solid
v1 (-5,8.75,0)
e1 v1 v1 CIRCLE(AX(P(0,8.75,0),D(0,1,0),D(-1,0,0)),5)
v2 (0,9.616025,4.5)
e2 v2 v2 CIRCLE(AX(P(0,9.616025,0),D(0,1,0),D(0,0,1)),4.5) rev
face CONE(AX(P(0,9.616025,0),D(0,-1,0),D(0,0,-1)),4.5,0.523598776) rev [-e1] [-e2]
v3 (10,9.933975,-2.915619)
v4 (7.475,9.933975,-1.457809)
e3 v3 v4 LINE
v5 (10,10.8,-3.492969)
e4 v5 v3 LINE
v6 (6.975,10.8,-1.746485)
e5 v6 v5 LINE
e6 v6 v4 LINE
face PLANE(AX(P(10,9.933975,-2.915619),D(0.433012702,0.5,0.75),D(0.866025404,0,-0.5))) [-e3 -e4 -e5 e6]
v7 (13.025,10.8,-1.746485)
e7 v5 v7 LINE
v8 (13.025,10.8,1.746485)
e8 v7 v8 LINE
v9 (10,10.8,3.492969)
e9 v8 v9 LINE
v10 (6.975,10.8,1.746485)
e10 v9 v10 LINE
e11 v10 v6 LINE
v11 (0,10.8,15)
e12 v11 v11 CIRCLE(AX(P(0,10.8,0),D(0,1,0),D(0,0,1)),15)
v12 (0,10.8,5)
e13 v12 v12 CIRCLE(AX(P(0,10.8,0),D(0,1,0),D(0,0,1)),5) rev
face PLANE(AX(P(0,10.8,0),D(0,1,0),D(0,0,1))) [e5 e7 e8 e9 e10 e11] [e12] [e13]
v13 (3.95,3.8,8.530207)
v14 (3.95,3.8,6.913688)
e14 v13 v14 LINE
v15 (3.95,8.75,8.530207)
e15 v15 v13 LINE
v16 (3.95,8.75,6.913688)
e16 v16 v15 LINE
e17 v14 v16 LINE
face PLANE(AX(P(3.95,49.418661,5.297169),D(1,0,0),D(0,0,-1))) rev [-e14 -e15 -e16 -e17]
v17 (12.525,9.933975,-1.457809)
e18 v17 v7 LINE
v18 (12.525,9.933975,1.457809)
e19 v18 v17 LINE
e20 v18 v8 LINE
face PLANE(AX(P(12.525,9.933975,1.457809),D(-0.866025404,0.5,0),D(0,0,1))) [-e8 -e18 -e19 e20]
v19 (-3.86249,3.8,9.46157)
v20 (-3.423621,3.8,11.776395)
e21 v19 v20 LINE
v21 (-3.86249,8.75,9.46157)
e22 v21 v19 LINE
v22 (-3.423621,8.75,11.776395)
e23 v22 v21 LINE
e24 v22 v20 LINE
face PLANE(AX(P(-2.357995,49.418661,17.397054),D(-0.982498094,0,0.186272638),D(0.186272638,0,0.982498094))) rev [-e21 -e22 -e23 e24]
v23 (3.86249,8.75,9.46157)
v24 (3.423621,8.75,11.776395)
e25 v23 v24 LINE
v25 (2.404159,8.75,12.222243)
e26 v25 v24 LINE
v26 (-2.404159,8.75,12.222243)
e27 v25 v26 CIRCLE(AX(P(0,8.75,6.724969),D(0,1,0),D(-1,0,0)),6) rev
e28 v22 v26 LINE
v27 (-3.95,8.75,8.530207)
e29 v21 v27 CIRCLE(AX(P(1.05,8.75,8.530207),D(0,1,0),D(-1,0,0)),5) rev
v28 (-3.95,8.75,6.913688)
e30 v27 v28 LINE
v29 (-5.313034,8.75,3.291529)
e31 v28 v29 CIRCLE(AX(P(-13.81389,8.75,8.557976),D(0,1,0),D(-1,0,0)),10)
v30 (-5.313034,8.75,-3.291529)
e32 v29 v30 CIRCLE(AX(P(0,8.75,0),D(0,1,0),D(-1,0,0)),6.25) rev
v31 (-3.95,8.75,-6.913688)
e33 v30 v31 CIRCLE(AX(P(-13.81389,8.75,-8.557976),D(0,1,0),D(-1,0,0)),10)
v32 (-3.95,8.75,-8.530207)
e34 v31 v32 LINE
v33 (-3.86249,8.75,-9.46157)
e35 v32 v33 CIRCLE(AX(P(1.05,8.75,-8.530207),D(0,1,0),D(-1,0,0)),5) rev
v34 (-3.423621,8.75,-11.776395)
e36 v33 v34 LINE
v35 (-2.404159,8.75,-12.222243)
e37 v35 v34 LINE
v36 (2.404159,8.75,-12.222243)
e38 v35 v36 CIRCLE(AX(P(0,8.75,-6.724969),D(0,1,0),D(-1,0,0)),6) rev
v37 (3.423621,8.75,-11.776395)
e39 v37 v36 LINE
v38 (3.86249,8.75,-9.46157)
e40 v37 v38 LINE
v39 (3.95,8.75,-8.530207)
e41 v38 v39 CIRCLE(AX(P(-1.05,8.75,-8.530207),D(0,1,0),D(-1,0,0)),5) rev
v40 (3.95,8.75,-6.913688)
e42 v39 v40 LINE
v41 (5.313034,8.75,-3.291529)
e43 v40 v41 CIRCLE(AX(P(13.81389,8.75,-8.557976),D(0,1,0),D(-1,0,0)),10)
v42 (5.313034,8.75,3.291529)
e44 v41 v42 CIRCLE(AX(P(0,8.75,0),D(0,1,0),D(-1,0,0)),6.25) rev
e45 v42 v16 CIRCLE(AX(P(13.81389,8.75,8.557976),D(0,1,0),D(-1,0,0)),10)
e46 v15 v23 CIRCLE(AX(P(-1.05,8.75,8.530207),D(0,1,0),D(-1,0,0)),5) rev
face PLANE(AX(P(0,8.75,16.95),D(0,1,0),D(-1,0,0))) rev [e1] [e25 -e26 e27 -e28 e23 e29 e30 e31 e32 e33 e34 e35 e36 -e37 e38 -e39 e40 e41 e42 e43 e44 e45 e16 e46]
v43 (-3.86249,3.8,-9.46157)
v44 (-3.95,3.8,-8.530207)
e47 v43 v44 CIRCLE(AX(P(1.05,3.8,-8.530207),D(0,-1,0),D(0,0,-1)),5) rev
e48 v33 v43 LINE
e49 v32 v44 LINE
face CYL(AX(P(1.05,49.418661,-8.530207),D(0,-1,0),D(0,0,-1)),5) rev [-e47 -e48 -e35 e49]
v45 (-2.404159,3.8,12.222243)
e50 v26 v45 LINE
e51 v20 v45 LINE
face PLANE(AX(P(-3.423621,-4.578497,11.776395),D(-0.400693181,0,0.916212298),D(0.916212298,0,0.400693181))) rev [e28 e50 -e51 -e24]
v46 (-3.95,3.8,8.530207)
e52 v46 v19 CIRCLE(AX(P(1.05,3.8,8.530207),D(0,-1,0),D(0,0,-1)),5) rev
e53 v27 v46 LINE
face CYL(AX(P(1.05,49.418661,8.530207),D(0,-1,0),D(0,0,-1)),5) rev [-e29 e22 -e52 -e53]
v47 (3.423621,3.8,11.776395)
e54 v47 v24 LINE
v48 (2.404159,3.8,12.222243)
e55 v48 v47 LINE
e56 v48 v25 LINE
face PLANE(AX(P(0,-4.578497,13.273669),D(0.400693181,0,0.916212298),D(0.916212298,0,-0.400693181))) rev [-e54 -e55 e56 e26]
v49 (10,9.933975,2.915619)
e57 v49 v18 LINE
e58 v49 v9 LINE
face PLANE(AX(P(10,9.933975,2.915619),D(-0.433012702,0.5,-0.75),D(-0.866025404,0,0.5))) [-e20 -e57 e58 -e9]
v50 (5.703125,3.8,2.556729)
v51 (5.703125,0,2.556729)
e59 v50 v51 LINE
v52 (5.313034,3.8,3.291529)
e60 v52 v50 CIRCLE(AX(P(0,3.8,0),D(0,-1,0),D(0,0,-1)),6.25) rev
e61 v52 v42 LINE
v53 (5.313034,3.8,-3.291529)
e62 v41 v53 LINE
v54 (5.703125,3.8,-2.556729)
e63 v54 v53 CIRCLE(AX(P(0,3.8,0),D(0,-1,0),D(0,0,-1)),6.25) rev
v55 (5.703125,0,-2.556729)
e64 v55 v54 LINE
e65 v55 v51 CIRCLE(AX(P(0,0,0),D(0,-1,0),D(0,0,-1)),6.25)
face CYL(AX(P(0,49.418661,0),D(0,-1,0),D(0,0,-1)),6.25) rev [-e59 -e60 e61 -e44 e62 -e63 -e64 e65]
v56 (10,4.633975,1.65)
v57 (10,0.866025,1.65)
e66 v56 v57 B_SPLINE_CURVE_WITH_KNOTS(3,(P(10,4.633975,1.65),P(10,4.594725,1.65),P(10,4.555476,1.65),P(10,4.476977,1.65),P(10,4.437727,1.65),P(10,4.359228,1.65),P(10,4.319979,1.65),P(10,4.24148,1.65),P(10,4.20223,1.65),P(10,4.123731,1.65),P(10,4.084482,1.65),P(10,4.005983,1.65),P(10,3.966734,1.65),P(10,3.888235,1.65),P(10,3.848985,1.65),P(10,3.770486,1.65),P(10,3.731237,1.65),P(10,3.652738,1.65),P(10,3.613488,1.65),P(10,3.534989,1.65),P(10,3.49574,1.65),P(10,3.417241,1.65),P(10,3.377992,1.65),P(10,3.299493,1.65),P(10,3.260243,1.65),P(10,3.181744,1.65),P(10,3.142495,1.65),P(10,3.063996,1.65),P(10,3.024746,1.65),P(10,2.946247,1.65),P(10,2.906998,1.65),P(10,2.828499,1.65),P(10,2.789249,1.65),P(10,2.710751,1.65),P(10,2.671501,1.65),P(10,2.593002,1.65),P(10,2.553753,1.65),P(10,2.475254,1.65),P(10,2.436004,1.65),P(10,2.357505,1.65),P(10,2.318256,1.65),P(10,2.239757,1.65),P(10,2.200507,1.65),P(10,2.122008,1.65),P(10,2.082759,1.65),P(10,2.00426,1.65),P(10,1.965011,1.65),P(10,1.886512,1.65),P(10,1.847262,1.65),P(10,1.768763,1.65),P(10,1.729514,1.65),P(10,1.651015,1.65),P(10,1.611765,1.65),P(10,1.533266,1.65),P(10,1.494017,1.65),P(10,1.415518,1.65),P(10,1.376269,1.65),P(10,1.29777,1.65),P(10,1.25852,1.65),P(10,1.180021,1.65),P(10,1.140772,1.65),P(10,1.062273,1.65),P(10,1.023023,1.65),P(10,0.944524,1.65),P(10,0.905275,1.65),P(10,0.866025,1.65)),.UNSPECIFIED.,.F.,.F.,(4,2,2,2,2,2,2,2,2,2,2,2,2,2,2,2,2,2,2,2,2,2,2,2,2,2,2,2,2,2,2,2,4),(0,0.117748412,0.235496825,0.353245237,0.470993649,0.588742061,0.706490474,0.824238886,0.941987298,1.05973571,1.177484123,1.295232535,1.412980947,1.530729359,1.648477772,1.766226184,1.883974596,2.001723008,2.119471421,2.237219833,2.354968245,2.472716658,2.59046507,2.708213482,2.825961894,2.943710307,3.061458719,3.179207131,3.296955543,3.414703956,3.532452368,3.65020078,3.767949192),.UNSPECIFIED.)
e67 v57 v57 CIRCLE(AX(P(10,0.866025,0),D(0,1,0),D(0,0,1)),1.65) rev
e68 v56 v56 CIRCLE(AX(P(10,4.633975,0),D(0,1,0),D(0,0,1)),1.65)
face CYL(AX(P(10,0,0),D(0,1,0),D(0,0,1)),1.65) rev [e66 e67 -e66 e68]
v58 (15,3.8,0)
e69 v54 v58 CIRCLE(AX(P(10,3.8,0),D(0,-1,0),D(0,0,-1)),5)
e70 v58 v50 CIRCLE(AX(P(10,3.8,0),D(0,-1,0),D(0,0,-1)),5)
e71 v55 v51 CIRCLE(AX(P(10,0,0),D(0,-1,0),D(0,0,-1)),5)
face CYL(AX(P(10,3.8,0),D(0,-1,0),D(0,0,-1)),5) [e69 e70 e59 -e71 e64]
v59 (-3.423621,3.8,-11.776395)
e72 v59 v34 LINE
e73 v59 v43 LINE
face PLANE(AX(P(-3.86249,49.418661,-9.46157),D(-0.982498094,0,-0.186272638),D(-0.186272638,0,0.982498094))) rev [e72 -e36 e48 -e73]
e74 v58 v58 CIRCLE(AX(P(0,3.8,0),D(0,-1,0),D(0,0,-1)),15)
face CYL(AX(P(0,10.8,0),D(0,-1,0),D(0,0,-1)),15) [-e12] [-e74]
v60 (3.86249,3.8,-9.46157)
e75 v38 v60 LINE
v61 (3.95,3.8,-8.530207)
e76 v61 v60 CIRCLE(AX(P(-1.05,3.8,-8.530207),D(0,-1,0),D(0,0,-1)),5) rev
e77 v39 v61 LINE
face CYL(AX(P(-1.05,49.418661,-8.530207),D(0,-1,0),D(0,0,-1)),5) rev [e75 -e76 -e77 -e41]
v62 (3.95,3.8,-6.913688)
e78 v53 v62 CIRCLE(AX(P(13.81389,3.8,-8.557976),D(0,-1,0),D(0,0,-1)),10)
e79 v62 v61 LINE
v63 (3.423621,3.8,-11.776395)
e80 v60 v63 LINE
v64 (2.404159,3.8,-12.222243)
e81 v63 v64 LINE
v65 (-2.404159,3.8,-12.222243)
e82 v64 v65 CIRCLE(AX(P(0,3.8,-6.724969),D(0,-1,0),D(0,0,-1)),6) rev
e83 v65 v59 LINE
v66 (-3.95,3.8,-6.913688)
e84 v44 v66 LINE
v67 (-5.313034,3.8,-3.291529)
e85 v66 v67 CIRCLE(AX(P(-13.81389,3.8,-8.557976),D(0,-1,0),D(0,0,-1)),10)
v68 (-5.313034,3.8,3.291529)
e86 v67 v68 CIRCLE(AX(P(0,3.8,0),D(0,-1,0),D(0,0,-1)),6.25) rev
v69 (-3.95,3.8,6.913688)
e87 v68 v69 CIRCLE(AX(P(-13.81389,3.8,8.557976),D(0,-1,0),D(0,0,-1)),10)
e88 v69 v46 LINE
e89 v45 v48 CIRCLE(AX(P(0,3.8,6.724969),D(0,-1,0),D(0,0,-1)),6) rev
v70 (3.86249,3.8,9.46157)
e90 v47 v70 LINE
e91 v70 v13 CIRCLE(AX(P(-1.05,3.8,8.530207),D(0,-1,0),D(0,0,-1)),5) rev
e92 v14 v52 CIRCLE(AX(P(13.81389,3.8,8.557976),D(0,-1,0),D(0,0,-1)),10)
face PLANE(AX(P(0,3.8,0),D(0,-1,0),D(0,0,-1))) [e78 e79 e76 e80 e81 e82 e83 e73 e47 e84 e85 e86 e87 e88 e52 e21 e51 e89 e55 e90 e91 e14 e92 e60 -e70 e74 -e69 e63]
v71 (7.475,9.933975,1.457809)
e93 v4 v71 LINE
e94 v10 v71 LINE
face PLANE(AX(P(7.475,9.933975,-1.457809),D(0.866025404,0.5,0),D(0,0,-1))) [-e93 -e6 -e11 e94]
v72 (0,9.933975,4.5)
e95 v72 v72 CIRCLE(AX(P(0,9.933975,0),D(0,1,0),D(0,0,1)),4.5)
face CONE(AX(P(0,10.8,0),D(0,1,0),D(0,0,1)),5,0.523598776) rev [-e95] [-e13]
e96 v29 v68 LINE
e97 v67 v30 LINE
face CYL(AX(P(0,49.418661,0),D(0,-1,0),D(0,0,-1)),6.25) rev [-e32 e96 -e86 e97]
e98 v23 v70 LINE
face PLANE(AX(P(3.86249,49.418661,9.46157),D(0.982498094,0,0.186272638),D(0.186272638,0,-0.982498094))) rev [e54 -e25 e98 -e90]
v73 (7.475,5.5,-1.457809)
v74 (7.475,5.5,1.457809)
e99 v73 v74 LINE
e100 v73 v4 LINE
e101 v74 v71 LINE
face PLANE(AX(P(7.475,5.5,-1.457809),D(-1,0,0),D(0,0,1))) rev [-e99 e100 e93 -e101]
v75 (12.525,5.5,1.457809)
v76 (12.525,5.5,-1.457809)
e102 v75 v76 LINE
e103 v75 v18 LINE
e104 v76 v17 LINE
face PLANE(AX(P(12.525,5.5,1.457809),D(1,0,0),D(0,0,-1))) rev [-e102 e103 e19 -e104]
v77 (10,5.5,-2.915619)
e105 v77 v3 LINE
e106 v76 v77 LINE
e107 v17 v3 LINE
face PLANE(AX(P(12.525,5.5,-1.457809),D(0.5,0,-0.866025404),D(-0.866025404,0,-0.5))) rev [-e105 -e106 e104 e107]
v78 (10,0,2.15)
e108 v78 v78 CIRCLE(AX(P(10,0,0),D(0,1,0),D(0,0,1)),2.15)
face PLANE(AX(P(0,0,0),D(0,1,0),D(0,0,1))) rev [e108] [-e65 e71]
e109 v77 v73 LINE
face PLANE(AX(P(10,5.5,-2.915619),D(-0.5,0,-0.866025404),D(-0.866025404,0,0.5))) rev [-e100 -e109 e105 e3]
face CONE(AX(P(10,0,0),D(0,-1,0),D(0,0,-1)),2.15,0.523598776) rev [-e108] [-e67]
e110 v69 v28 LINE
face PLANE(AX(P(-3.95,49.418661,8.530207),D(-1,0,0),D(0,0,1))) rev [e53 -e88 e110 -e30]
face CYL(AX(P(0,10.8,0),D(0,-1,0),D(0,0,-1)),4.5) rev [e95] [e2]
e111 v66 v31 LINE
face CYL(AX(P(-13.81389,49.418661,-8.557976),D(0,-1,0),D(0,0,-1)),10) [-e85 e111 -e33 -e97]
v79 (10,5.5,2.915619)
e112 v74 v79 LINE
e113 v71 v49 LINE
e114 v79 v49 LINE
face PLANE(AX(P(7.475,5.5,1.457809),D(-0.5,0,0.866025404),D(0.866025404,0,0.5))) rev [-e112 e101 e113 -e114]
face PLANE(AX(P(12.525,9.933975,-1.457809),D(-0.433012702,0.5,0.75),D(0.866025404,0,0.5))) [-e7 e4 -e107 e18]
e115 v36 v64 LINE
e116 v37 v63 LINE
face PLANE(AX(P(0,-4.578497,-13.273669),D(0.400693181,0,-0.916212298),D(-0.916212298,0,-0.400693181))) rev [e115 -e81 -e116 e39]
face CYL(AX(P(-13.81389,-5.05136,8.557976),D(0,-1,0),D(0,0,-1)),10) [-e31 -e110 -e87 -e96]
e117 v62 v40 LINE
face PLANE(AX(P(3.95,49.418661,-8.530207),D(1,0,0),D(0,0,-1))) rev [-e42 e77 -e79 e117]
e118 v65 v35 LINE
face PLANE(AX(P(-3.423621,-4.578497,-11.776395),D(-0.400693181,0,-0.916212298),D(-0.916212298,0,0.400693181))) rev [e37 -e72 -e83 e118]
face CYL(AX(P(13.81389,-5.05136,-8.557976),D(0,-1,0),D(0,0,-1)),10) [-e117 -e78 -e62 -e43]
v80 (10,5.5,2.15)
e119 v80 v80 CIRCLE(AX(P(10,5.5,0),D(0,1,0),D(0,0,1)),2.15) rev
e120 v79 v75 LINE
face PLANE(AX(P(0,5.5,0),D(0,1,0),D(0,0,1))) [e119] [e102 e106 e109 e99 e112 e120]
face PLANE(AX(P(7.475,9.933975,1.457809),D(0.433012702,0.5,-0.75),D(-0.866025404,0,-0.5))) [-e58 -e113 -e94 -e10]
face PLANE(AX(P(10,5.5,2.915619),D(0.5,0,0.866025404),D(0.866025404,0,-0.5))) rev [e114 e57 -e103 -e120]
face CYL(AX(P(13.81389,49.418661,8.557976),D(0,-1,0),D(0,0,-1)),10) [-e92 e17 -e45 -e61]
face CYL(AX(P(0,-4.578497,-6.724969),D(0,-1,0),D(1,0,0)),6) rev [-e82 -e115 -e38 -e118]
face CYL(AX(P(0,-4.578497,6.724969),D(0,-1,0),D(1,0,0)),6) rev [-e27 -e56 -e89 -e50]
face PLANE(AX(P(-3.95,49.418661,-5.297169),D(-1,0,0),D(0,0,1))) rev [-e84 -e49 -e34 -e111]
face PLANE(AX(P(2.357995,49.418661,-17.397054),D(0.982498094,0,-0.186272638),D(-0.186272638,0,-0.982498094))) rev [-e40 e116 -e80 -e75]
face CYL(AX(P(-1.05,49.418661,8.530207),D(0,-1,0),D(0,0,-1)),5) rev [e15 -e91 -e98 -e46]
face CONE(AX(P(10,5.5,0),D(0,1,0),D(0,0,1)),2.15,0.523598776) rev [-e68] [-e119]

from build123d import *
from OCP.BRepFilletAPI import BRepFilletAPI_MakeChamfer

# Parameters (mm, degrees)
SKETCH_1_R          = 15
EXTRUDE_1_DEPTH     = 10.8
SKETCH_2_R          = 2
SKETCH_2_R_2        = 1.6500000000000006
CUT_EXTRUDE_1_DEPTH = 24.804201309852846
CUT_EXTRUDE_START   = -8.75
CUT_EXTRUDE_2_DEPTH = 8.75
SKETCH_8_R          = 4.5
CUT_EXTRUDE_3_DEPTH = 23.946949687399407
CUT_EXTRUDE_4_DEPTH = 5.3
SKETCH_10_R         = 20.165884728601043
SKETCH_10_R_2       = 4.999999999999998
CUT_EXTRUDE_5_DEPTH = 3.8
CHAMFER_1_SIZE      = 0.5
CHAMFER_1_SIZE2     = 0.8660254037844434
CHAMFER_1_SIZE2_2   = 0.866025403784443
CHAMFER_2_SIZE      = 0.5
CHAMFER_2_SIZE2     = 0.8660254037844434
CHAMFER_5_SIZE      = 3
CUT_EXTRUDE_8_DEPTH = 4.949999997
FILLET_1_R          = 10
EXTRUDE_3_DEPTH     = 4.949999997
FILLET_2_R          = 6


with BuildPart() as part:
    # 草图1 → 凸台-拉伸1 (new body)
    with BuildSketch(Plane(origin=(0, 0, 0), x_dir=(1, 0, 0), z_dir=(0, 1, 0))):
        with Locations(Location((0, 0, 0), (0, 0, 90))):
            Circle(SKETCH_1_R)
    extrude(amount=EXTRUDE_1_DEPTH)

    # 草图2 → 切除-拉伸1 (cut, through all)
    with BuildSketch(Plane(origin=(0, 10.8, 0), x_dir=(1, 0, 0), z_dir=(0, 1, 0))):
        with Locations(Location((0, 0, 0), (0, 0, 270))):
            Circle(SKETCH_2_R)
        with Locations(Location((10, 0, 0), (0, 0, 270))):
            Circle(SKETCH_2_R_2)
    extrude(amount=-CUT_EXTRUDE_1_DEPTH, mode=Mode.SUBTRACT)

    # 草图7 → 切除-拉伸2 (cut)
    with BuildSketch(Plane.XZ.offset(CUT_EXTRUDE_START)):
        with BuildLine():
            Line((3.9499999999999917, -8.530207271324839), (3.9499999999999926, -5.297169055259961))
            ThreePointArc((3.9499999999999926, -5.297169055259961), (4.032732694169919, -4.898896925108727), (4.267241379310367, -4.566525047637877))
            ThreePointArc((4.267241379310367, -4.566525047637877), (6.250000000000189, 1.0156e-13), (4.2672413793103745, 4.5665250476380885))
            ThreePointArc((4.2672413793103745, 4.5665250476380885), (4.03273269416984, 4.898896925108895), (3.9500000000000046, 5.297169055260161))
            Line((3.9500000000000046, 5.297169055260161), (3.9500000000000046, 8.530207271324992))
            ThreePointArc((3.9500000000000046, 8.530207271324992), (3.9280745447413654, 8.997939916110184), (3.8624904692009197, 9.461570460424896))
            Line((3.8624904692009197, 9.461570460424896), (2.357995425216292, 17.39705433076952))
            ThreePointArc((2.357995425216292, 17.39705433076952), (-3.9497e-13, 19.350000000001156), (-2.357995425216957, 17.397054330769397))
            Line((-2.357995425216957, 17.397054330769397), (-3.8624904692015747, 9.461570460424964))
            ThreePointArc((-3.8624904692015747, 9.461570460424964), (-3.9280745447421004, 8.997939916110258), (-3.950000000000667, 8.530207271325056))
            Line((-3.950000000000667, 8.530207271325056), (-3.9500000000006588, 5.297169055260163))
            ThreePointArc((-3.9500000000006588, 5.297169055260163), (-4.0327326941706, 4.898896925108942), (-4.267241379311038, 4.5665250476381))
            ThreePointArc((-4.267241379311038, 4.5665250476381), (-6.250000000000874, 1.1135e-13), (-4.267241379311047, -4.566525047637879))
            ThreePointArc((-4.267241379311047, -4.566525047637879), (-4.032732694170509, -4.898896925108689), (-3.9500000000006716, -5.29716905525996))
            Line((-3.9500000000006716, -5.29716905525996), (-3.950000000000676, -8.530207271324784))
            ThreePointArc((-3.950000000000676, -8.530207271324784), (-3.9280745447420373, -8.997939916109978), (-3.862490469201592, -9.461570460424696))
            Line((-3.862490469201592, -9.461570460424696), (-2.3579954252169664, -17.397054330769286))
            ThreePointArc((-2.3579954252169664, -17.397054330769286), (-2.7734e-13, -19.35000000000094), (2.3579954252163073, -17.39705433076917))
            Line((2.3579954252163073, -17.39705433076917), (3.8624904692009046, -9.461570460424774))
            ThreePointArc((3.8624904692009046, -9.461570460424774), (3.9280745447414347, -8.997939916110052), (3.9499999999999917, -8.530207271324839))
        make_face()
    extrude(amount=CUT_EXTRUDE_2_DEPTH, mode=Mode.SUBTRACT)

    # 草图8 → 切除-拉伸3 (cut, through all)
    with BuildSketch(Plane.XZ.offset(-8.749999997487969)):
        with Locations(Location((0, 0, 0), (0, 0, 270))):
            Circle(SKETCH_8_R)
    extrude(amount=-CUT_EXTRUDE_3_DEPTH, mode=Mode.SUBTRACT)

    # 草图9 → 切除-拉伸4 (cut)
    with BuildSketch(Plane(origin=(0, 10.8, 0), x_dir=(1, 0, 0), z_dir=(0, 1, 0))):
        Polygon((10.000000000000002, -2.9156188594076102), (12.525000000000002, -1.4578094297038038), (12.525000000000002, 1.457809429703804), (10.000000000000002, 2.915618859407609), (7.475000000000001, 1.4578094297038038), (7.475000000000001, -1.457809429703805), align=None)
    extrude(amount=-CUT_EXTRUDE_4_DEPTH, mode=Mode.SUBTRACT)

    # 草图10 → 切除-拉伸5 (cut)
    with BuildSketch(Plane.XZ):
        Circle(SKETCH_10_R)
        with Locations((10, 0)):
            Circle(SKETCH_10_R_2, mode=Mode.SUBTRACT)
    extrude(amount=-CUT_EXTRUDE_5_DEPTH, mode=Mode.SUBTRACT)

    # 倒角1: one chamfer whose edges measure the first distance from different faces: ONE call of the kernel's chamfer builder (chamfer() names one face for all edges)
    chamfer_1_edges_1 = [part.edges().sort_by_distance(p)[0] for p in [
        (1.63e-14, 8.749999997487969, 4.5),
    ]]
    chamfer_1_side_1 = [part.faces().sort_by_distance(p)[0] for p in [
        (-5.92500000000087, 8.75, 1.129e-13),
    ]]
    chamfer_1_edges_2 = [part.edges().sort_by_distance(p)[0] for p in [
        (1.629e-14, 10.8, 4.5),
    ]]
    chamfer_1_side_2 = [part.faces().sort_by_distance(p)[0] for p in [
        (-9.15e-15, 10.8, 14.575735931288072),
    ]]
    chamfer_1_edges_3 = [part.edges().sort_by_distance(p)[0] for p in [
        (10, 5.500000000000001, -1.6500000000000006),
    ]]
    chamfer_1_side_3 = [part.faces().sort_by_distance(p)[0] for p in [
        (11.22392998790079, 5.500000000000001, 2.1199089239513262),
    ]]
    chamfer_1_edges_4 = [part.edges().sort_by_distance(p)[0] for p in [
        (10, 0, -1.6500000000000006),
    ]]
    chamfer_1_side_4 = [part.faces().sort_by_distance(p)[0] for p in [
        (14.863459938199213, 0, -5.27e-14),
    ]]
    chamfer_1 = BRepFilletAPI_MakeChamfer(part.part.solid().wrapped)
    for e in chamfer_1_edges_1:
        chamfer_1.Add(CHAMFER_1_SIZE, CHAMFER_1_SIZE2, e.wrapped, chamfer_1_side_1[0].wrapped)  # the first distance lies on this face
    for e in chamfer_1_edges_2:
        chamfer_1.Add(CHAMFER_1_SIZE, CHAMFER_1_SIZE2_2, e.wrapped, chamfer_1_side_2[0].wrapped)  # the first distance lies on this face
    for e in chamfer_1_edges_3:
        chamfer_1.Add(CHAMFER_1_SIZE, CHAMFER_1_SIZE2, e.wrapped, chamfer_1_side_3[0].wrapped)  # the first distance lies on this face
    for e in chamfer_1_edges_4:
        chamfer_1.Add(CHAMFER_1_SIZE, CHAMFER_1_SIZE2, e.wrapped, chamfer_1_side_4[0].wrapped)  # the first distance lies on this face
    add(Compound.cast(chamfer_1.Shape()), mode=Mode.REPLACE)

    # 倒角2
    chamfer_2_edges = [part.edges().sort_by_distance(p)[0] for p in [
        (8.7375, 10.8, 2.1867141445557077),
        (11.262500000000003, 10.8, 2.1867141445557072),
        (12.525000000000002, 10.8, 0),
        (11.262500000000003, 10.8, -2.1867141445557063),
        (8.7375, 10.8, -2.1867141445557063),
        (7.475000000000001, 10.8, 4.4e-16),
    ]]
    chamfer_2_side = [part.faces().sort_by_distance(p)[0] for p in [
        (1.659e-14, 10.8, 5.424264068711929),
    ]]
    chamfer(chamfer_2_edges, length=CHAMFER_2_SIZE, length2=CHAMFER_2_SIZE2, reference=chamfer_2_side[0])

    # 倒角5
    # the kernel refuses this chamfer: 3, 1.026536878 mm, written as the material it takes off along each edge
    with BuildSketch(Plane(origin=(2.8648031094259725, 8.75, -14.723888859408826), x_dir=(0.9744700322963631, 0, 0.22451760767548937), z_dir=(0, -1, 0))) as chamfer_5_piece_1:
        with BuildLine():
            Line((1.0282150476584273, 1e-17), (CHAMFER_5_SIZE * 0.402105224967, CHAMFER_5_SIZE * 0.915593462217))
            Line((CHAMFER_5_SIZE * 0.402105224967, CHAMFER_5_SIZE * 0.915593462217), (0, 0))
            ThreePointArc((0, 0), (0.5102384602977388, -0.00881230806576972), (1.0282150476584273, 1e-17))
        make_face()
    extrude(amount=12.732584197651619, mode=Mode.SUBTRACT)
    with BuildSketch(Plane(origin=(-2.864803109426696, 8.75, 14.723888859408683), x_dir=(-0.974470032296352, 0, -0.22451760767553783), z_dir=(0, -1, 0))) as chamfer_5_piece_2:
        with BuildLine():
            Line((1.028215047658435, -1e-17), (CHAMFER_5_SIZE * 0.402105224967, CHAMFER_5_SIZE * 0.915593462217))
            Line((CHAMFER_5_SIZE * 0.402105224967, CHAMFER_5_SIZE * 0.915593462217), (0, 0))
            ThreePointArc((0, 0), (0.5102384602977391, -0.00881230806576976), (1.028215047658435, -1e-17))
        make_face()
    extrude(amount=12.732584197651615, mode=Mode.SUBTRACT)
    with BuildSketch(Plane(origin=(2.86480310942602, 8.75, 14.723888859408815), x_dir=(0.9744700322963621, 0, -0.22451760767549345), z_dir=(0, -1, 0))) as chamfer_5_piece_3:
        with BuildLine():
            Line((1.0282150476584324, 0), (CHAMFER_5_SIZE * 0.402105224967, -CHAMFER_5_SIZE * 0.915593462217))
            Line((CHAMFER_5_SIZE * 0.402105224967, -CHAMFER_5_SIZE * 0.915593462217), (0, 0))
            ThreePointArc((0, 0), (0.510238460297736, 0.00881230806577126), (1.0282150476584324, 0))
        make_face()
    extrude(amount=12.73258419765161, mode=Mode.SUBTRACT)
    with BuildSketch(Plane(origin=(-2.864803109426677, 8.75, -14.723888859408687), x_dir=(-0.9744700322963524, 0, 0.22451760767553572), z_dir=(0, -1, 0))) as chamfer_5_piece_4:
        with BuildLine():
            Line((1.0282150476584369, 1e-17), (CHAMFER_5_SIZE * 0.402105224967, -CHAMFER_5_SIZE * 0.915593462217))
            Line((CHAMFER_5_SIZE * 0.402105224967, -CHAMFER_5_SIZE * 0.915593462217), (0, 0))
            ThreePointArc((0, 0), (0.5102384602977413, 0.00881230806576916), (1.0282150476584369, 1e-17))
        make_face()
    extrude(amount=12.73258419765161, mode=Mode.SUBTRACT)

    # 草图15 → 切除-拉伸8 (cut)
    with BuildSketch(Plane.XZ.offset(-8.749999997487969)):
        Polygon((-3.9500000000006734, 6.9136881632925755), (-4.267241379311041, 4.566525047638101), (4.2672413793103265, 4.566525047638054), (3.94999999999999, 6.913688163292576), align=None)
        Polygon((3.9499999999999864, -6.913688163292576), (-3.95000000000067, -6.9136881632925755), (-4.267241379311037, -4.566525047638101), (4.267241379310323, -4.566525047638054), align=None)
    extrude(amount=CUT_EXTRUDE_8_DEPTH, mode=Mode.SUBTRACT)

    # 圆角1
    # the kernel refuses this fillet: 10 mm, written as the material it takes off along each edge
    with BuildSketch(Plane(origin=(-4.267241379311048, 8.75, -4.566525047637879), x_dir=(0.1339416025290595, 0, -0.9909892265367709), z_dir=(0, -1, 0))) as fillet_1_piece_1:
        with BuildLine():
            CenterArc((2.6767916675051966, -9.995246842433291), FILLET_1_R, 91.76663137711618, 22.314975038449404)
            ThreePointArc((-1.403582267080249, -0.865594682906308), (-0.6731180144781167, -0.47929148270895244), (0, 0))
            Line((0, 0), (2.3685051792716596, 0))
        make_face()
    extrude(amount=10.87126294817915, mode=Mode.SUBTRACT)
    with BuildSketch(Plane(origin=(4.2672413793103665, 8.75, -4.566525047637878), x_dir=(0.6341871066199304, 0, 0.7731796128953744), z_dir=(0, -1, 0))) as fillet_1_piece_2:
        with BuildLine():
            CenterArc((2.968252578056993, -9.912600552088037), FILLET_1_R, 97.58069095736383, 22.314975038449475)
            Line((-2.0159690616089736, -1.2432560182328116), (0, 0))
            ThreePointArc((0, 0), (0.8245146050158637, -0.05462465494498077), (1.6490292100317274, 2e-17))
        make_face()
    extrude(amount=10.871262948179146, mode=Mode.SUBTRACT)
    with BuildSketch(Plane(origin=(4.267241379310374, 8.75, 4.566525047638088), x_dir=(-0.13394160252906265, 0, 0.9909892265367705), z_dir=(0, -1, 0))) as fillet_1_piece_3:
        with BuildLine():
            CenterArc((2.676791667505193, -9.995246842433284), FILLET_1_R, 91.76663137711736, 22.314975038448097)
            ThreePointArc((-1.4035822670802323, -0.8655946829062929), (-0.673118014478111, -0.4792914827089432), (0, 0))
            Line((0, 0), (2.3685051792714518, -2e-17))
        make_face()
    extrude(amount=10.87126294817863, mode=Mode.SUBTRACT)
    with BuildSketch(Plane(origin=(-4.267241379311038, 8.75, 4.5665250476381), x_dir=(-0.6341871066199348, 0, -0.7731796128953706), z_dir=(0, -1, 0))) as fillet_1_piece_4:
        with BuildLine():
            CenterArc((2.9682525780569233, -9.91260055208804), FILLET_1_R, 97.58069095736364, 22.314975038448054)
            Line((-2.0159690616087995, -1.243256018232675), (0, 0))
            ThreePointArc((0, 0), (0.8245146050158442, -0.05462465494498064), (1.6490292100316903, 3e-17))
        make_face()
    extrude(amount=10.871262948178595, mode=Mode.SUBTRACT)

    # 凸台-拉伸3: read off the stored shape, not the designer's step
    # 凸台-拉伸3 outline → 凸台-拉伸3 (add)
    with BuildSketch(Plane.XZ.offset(-8.749999997487969)):
        with BuildLine():
            Line((-3.423621023, 11.776394578), (0, 13.273669394))
            Line((0, 13.273669394), (3.423621023, 11.776394578))
            Line((3.423621023, 11.776394578), (3.86676786, 14.493036477))
            ThreePointArc((3.86676786, 14.493036477), (0, 15), (-3.86676786, 14.493036477))
            Line((-3.86676786, 14.493036477), (-3.423621023, 11.776394578))
        make_face()
        with BuildLine():
            Line((-3.423621023, -11.776394578), (-3.86676786, -14.493036477))
            ThreePointArc((-3.86676786, -14.493036477), (0, -15), (3.86676786, -14.493036477))
            Line((3.86676786, -14.493036477), (3.423621023, -11.776394578))
            Line((3.423621023, -11.776394578), (0, -13.273669394))
            Line((0, -13.273669394), (-3.423621023, -11.776394578))
        make_face()
    extrude(amount=EXTRUDE_3_DEPTH)

    # 圆角2
    fillet_2_edges = [part.edges().sort_by_distance(p)[0] for p in [
        (1.07e-14, 6.274999998987969, 13.273669394),
        (1.07e-14, 6.274999998987969, -13.273669394),
    ]]
    fillet(fillet_2_edges, radius=FILLET_2_R)


solid = part.part
